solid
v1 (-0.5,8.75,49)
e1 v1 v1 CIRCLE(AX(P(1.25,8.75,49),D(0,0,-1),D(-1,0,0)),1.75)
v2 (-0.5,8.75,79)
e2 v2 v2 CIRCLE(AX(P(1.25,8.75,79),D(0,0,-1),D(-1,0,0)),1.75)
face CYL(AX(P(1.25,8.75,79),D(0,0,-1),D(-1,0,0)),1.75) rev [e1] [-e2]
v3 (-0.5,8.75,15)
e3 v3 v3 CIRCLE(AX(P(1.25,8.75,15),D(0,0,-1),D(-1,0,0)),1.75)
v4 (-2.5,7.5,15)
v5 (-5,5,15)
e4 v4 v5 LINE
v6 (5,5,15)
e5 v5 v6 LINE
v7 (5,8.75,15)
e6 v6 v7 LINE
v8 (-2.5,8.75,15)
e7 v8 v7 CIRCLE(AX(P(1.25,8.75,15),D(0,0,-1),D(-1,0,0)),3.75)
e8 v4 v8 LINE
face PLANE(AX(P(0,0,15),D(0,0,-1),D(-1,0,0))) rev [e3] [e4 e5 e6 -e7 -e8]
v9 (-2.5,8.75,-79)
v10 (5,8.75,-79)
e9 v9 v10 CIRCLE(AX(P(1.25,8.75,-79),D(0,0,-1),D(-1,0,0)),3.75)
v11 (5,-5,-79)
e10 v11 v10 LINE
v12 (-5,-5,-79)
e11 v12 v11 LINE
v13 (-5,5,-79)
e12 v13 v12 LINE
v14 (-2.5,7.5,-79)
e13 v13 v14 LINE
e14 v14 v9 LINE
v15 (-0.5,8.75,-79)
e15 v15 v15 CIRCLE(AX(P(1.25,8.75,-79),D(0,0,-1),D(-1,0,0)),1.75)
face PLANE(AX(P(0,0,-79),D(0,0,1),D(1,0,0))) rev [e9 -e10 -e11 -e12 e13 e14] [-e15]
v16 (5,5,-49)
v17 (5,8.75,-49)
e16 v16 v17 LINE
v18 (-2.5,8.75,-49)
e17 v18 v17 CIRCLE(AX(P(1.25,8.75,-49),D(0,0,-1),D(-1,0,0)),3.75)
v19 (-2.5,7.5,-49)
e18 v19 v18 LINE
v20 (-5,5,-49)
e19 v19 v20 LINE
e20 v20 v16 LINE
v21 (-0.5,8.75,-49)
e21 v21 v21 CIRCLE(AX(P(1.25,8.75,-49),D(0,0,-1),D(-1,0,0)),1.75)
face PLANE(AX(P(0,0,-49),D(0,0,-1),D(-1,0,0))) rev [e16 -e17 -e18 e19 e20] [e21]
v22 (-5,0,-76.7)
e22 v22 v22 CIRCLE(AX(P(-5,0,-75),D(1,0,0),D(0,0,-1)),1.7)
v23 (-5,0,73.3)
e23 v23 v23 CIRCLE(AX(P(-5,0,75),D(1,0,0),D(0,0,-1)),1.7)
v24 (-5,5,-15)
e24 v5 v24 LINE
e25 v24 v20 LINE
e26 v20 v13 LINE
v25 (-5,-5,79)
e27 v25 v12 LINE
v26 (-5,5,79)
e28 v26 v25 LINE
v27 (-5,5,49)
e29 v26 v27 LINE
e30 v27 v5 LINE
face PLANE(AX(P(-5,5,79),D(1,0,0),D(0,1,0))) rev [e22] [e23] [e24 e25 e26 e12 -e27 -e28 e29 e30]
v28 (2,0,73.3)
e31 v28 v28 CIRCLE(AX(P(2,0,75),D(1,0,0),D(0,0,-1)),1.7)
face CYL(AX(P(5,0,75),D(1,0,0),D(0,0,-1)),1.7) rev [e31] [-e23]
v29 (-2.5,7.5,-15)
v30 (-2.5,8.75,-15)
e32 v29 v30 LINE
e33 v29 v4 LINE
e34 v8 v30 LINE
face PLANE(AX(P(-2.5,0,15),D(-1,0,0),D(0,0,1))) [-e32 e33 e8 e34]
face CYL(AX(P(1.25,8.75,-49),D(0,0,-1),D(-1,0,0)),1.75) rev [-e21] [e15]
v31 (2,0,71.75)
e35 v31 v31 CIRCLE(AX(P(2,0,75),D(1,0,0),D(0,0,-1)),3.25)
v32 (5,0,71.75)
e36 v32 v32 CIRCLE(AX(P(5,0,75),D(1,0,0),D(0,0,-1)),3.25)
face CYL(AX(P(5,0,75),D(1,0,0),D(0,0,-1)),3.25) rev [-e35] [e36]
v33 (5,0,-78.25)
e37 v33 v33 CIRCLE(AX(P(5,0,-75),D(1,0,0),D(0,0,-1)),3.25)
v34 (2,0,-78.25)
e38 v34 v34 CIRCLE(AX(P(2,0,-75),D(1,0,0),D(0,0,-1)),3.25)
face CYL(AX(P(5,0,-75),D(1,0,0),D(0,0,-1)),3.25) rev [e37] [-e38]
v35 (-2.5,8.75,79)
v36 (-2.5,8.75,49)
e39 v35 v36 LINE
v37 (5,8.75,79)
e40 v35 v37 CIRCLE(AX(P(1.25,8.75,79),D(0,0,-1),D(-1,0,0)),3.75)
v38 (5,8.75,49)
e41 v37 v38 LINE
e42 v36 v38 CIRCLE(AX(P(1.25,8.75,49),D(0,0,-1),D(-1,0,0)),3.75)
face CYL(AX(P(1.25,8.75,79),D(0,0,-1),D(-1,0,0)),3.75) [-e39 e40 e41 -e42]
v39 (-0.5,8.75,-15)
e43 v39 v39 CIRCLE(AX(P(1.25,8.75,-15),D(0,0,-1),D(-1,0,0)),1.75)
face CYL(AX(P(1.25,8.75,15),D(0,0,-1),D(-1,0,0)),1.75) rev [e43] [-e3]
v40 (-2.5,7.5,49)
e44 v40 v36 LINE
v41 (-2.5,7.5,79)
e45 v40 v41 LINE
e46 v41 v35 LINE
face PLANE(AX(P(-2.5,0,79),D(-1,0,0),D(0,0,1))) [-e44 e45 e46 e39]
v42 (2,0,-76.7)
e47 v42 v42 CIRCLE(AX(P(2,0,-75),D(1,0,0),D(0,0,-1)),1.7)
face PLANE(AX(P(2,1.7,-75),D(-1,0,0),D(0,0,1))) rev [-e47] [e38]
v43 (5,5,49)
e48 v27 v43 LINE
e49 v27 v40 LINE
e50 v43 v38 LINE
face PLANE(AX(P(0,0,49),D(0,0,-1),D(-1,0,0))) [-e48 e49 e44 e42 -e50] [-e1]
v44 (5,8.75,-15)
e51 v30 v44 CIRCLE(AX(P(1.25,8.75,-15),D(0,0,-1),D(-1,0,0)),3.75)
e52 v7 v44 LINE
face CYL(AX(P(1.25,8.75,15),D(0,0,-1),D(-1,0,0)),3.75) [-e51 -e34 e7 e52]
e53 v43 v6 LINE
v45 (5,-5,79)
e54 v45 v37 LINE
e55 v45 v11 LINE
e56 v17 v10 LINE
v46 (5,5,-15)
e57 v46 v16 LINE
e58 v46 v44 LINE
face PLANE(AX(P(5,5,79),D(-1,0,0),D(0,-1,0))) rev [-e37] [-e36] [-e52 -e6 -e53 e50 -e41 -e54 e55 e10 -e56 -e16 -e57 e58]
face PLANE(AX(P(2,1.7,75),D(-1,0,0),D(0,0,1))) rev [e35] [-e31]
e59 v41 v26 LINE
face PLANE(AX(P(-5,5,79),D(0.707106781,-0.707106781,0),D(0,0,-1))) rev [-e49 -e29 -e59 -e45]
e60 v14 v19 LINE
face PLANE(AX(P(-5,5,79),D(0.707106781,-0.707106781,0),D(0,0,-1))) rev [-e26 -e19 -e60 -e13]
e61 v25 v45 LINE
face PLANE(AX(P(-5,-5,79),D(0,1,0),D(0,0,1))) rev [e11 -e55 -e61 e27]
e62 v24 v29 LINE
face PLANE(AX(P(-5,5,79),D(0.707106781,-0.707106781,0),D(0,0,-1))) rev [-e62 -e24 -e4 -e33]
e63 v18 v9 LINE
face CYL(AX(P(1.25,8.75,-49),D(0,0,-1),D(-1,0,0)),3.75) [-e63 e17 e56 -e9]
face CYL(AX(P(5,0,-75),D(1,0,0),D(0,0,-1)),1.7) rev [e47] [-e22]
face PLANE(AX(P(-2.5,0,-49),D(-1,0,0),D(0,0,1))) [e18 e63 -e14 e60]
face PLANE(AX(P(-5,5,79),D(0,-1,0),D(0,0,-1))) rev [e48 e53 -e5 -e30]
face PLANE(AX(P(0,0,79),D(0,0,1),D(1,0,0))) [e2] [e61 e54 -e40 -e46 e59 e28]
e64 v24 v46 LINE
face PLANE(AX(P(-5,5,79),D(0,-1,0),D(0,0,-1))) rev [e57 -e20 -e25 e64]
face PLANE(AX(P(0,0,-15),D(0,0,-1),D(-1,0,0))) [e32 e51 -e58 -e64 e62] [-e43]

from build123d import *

# Parameters (mm, degrees)
ESQUISSE1_W                                     = 10
ESQUISSE1_H                                     = 10
BOSS_EXTRU_1_DEPTH                              = 79
ESQUISSE2_R                                     = 3.75
ESQUISSE2_R_2                                   = 1.75
BOSS_EXTRU_2_DEPTH                              = 30
R_P_TITION_LIN_AIRE1_COUNT                      = 3
R_P_TITION_LIN_AIRE1_PITCH                      = 64
CHAMBRAGE_POUR_VIS_T_TE_CYLINDRIQUE_D           = 3.4
CHAMBRAGE_POUR_VIS_T_TE_CYLINDRIQUE_CBORE_D     = 6.5
CHAMBRAGE_POUR_VIS_T_TE_CYLINDRIQUE_CBORE_DEPTH = 3
CHANFREIN1_SIZE                                 = 2.5


with BuildPart() as part:
    # Esquisse1 → Boss.-Extru.1 (new, symmetric)
    with BuildSketch(Plane.XY):
        Rectangle(ESQUISSE1_W, ESQUISSE1_H)
    extrude(amount=BOSS_EXTRU_1_DEPTH, both=True)

    # Esquisse2 → Boss.-Extru.2 (add)
    # profile 1 of 3: a face of its own
    with BuildSketch(Plane(origin=(0, 0, -79), x_dir=(-1, 0, 0), z_dir=(0, 0, -1))):
        with BuildLine():
            Line((-5, 5), (-1.25, 5))
            ThreePointArc((-1.25, 5), (-3.901650429, 6.098349571), (-5, 8.75))
            Line((-5, 8.75), (-5, 5))
        make_face()
    # profile 2 of 3: a face of its own
    with BuildSketch(Plane(origin=(0, 0, -79), x_dir=(-1, 0, 0), z_dir=(0, 0, -1))):
        with Locations((-1.25, 8.75)):
            Circle(ESQUISSE2_R)
        with Locations((-1.25, 8.75)):
            Circle(ESQUISSE2_R_2, mode=Mode.SUBTRACT)
    # profile 3 of 3: a face of its own
    with BuildSketch(Plane(origin=(0, 0, -79), x_dir=(-1, 0, 0), z_dir=(0, 0, -1))):
        with BuildLine():
            ThreePointArc((2.5, 8.75), (1.401650429, 6.098349571), (-1.25, 5))
            Line((-1.25, 5), (2.5, 5))
            Line((2.5, 5), (2.5, 8.75))
        make_face()
    boss_extru_2 = extrude(amount=-BOSS_EXTRU_2_DEPTH)

    # Répétition linéaire1: Boss.-Extru.2 ×3
    with Locations(*[(0, 0, i * R_P_TITION_LIN_AIRE1_PITCH) for i in range(1, R_P_TITION_LIN_AIRE1_COUNT)]):
        add(boss_extru_2)

    # Chambrage pour vis à tête cylindrique à 6 pans creux (ou vis CHC) M31 (through all)
    with Locations(Plane(origin=(5, 0, 0), x_dir=(0, 0, -1), z_dir=(1, 0, 0))):
        with Locations((-75, 0), (75, 0)):
            CounterBoreHole(CHAMBRAGE_POUR_VIS_T_TE_CYLINDRIQUE_D / 2, CHAMBRAGE_POUR_VIS_T_TE_CYLINDRIQUE_CBORE_D / 2, CHAMBRAGE_POUR_VIS_T_TE_CYLINDRIQUE_CBORE_DEPTH)

    # Chanfrein1
    chanfrein1_edges = [part.edges().sort_by_distance(p)[0] for p in [
        (-2.5, 5, 64),
        (-2.5, 5, 0),
        (-2.5, 5, -64),
    ]]
    chamfer(chanfrein1_edges, length=CHANFREIN1_SIZE - 0.0001)  # a hair under: the kernel refuses the full size


solid = part.part
